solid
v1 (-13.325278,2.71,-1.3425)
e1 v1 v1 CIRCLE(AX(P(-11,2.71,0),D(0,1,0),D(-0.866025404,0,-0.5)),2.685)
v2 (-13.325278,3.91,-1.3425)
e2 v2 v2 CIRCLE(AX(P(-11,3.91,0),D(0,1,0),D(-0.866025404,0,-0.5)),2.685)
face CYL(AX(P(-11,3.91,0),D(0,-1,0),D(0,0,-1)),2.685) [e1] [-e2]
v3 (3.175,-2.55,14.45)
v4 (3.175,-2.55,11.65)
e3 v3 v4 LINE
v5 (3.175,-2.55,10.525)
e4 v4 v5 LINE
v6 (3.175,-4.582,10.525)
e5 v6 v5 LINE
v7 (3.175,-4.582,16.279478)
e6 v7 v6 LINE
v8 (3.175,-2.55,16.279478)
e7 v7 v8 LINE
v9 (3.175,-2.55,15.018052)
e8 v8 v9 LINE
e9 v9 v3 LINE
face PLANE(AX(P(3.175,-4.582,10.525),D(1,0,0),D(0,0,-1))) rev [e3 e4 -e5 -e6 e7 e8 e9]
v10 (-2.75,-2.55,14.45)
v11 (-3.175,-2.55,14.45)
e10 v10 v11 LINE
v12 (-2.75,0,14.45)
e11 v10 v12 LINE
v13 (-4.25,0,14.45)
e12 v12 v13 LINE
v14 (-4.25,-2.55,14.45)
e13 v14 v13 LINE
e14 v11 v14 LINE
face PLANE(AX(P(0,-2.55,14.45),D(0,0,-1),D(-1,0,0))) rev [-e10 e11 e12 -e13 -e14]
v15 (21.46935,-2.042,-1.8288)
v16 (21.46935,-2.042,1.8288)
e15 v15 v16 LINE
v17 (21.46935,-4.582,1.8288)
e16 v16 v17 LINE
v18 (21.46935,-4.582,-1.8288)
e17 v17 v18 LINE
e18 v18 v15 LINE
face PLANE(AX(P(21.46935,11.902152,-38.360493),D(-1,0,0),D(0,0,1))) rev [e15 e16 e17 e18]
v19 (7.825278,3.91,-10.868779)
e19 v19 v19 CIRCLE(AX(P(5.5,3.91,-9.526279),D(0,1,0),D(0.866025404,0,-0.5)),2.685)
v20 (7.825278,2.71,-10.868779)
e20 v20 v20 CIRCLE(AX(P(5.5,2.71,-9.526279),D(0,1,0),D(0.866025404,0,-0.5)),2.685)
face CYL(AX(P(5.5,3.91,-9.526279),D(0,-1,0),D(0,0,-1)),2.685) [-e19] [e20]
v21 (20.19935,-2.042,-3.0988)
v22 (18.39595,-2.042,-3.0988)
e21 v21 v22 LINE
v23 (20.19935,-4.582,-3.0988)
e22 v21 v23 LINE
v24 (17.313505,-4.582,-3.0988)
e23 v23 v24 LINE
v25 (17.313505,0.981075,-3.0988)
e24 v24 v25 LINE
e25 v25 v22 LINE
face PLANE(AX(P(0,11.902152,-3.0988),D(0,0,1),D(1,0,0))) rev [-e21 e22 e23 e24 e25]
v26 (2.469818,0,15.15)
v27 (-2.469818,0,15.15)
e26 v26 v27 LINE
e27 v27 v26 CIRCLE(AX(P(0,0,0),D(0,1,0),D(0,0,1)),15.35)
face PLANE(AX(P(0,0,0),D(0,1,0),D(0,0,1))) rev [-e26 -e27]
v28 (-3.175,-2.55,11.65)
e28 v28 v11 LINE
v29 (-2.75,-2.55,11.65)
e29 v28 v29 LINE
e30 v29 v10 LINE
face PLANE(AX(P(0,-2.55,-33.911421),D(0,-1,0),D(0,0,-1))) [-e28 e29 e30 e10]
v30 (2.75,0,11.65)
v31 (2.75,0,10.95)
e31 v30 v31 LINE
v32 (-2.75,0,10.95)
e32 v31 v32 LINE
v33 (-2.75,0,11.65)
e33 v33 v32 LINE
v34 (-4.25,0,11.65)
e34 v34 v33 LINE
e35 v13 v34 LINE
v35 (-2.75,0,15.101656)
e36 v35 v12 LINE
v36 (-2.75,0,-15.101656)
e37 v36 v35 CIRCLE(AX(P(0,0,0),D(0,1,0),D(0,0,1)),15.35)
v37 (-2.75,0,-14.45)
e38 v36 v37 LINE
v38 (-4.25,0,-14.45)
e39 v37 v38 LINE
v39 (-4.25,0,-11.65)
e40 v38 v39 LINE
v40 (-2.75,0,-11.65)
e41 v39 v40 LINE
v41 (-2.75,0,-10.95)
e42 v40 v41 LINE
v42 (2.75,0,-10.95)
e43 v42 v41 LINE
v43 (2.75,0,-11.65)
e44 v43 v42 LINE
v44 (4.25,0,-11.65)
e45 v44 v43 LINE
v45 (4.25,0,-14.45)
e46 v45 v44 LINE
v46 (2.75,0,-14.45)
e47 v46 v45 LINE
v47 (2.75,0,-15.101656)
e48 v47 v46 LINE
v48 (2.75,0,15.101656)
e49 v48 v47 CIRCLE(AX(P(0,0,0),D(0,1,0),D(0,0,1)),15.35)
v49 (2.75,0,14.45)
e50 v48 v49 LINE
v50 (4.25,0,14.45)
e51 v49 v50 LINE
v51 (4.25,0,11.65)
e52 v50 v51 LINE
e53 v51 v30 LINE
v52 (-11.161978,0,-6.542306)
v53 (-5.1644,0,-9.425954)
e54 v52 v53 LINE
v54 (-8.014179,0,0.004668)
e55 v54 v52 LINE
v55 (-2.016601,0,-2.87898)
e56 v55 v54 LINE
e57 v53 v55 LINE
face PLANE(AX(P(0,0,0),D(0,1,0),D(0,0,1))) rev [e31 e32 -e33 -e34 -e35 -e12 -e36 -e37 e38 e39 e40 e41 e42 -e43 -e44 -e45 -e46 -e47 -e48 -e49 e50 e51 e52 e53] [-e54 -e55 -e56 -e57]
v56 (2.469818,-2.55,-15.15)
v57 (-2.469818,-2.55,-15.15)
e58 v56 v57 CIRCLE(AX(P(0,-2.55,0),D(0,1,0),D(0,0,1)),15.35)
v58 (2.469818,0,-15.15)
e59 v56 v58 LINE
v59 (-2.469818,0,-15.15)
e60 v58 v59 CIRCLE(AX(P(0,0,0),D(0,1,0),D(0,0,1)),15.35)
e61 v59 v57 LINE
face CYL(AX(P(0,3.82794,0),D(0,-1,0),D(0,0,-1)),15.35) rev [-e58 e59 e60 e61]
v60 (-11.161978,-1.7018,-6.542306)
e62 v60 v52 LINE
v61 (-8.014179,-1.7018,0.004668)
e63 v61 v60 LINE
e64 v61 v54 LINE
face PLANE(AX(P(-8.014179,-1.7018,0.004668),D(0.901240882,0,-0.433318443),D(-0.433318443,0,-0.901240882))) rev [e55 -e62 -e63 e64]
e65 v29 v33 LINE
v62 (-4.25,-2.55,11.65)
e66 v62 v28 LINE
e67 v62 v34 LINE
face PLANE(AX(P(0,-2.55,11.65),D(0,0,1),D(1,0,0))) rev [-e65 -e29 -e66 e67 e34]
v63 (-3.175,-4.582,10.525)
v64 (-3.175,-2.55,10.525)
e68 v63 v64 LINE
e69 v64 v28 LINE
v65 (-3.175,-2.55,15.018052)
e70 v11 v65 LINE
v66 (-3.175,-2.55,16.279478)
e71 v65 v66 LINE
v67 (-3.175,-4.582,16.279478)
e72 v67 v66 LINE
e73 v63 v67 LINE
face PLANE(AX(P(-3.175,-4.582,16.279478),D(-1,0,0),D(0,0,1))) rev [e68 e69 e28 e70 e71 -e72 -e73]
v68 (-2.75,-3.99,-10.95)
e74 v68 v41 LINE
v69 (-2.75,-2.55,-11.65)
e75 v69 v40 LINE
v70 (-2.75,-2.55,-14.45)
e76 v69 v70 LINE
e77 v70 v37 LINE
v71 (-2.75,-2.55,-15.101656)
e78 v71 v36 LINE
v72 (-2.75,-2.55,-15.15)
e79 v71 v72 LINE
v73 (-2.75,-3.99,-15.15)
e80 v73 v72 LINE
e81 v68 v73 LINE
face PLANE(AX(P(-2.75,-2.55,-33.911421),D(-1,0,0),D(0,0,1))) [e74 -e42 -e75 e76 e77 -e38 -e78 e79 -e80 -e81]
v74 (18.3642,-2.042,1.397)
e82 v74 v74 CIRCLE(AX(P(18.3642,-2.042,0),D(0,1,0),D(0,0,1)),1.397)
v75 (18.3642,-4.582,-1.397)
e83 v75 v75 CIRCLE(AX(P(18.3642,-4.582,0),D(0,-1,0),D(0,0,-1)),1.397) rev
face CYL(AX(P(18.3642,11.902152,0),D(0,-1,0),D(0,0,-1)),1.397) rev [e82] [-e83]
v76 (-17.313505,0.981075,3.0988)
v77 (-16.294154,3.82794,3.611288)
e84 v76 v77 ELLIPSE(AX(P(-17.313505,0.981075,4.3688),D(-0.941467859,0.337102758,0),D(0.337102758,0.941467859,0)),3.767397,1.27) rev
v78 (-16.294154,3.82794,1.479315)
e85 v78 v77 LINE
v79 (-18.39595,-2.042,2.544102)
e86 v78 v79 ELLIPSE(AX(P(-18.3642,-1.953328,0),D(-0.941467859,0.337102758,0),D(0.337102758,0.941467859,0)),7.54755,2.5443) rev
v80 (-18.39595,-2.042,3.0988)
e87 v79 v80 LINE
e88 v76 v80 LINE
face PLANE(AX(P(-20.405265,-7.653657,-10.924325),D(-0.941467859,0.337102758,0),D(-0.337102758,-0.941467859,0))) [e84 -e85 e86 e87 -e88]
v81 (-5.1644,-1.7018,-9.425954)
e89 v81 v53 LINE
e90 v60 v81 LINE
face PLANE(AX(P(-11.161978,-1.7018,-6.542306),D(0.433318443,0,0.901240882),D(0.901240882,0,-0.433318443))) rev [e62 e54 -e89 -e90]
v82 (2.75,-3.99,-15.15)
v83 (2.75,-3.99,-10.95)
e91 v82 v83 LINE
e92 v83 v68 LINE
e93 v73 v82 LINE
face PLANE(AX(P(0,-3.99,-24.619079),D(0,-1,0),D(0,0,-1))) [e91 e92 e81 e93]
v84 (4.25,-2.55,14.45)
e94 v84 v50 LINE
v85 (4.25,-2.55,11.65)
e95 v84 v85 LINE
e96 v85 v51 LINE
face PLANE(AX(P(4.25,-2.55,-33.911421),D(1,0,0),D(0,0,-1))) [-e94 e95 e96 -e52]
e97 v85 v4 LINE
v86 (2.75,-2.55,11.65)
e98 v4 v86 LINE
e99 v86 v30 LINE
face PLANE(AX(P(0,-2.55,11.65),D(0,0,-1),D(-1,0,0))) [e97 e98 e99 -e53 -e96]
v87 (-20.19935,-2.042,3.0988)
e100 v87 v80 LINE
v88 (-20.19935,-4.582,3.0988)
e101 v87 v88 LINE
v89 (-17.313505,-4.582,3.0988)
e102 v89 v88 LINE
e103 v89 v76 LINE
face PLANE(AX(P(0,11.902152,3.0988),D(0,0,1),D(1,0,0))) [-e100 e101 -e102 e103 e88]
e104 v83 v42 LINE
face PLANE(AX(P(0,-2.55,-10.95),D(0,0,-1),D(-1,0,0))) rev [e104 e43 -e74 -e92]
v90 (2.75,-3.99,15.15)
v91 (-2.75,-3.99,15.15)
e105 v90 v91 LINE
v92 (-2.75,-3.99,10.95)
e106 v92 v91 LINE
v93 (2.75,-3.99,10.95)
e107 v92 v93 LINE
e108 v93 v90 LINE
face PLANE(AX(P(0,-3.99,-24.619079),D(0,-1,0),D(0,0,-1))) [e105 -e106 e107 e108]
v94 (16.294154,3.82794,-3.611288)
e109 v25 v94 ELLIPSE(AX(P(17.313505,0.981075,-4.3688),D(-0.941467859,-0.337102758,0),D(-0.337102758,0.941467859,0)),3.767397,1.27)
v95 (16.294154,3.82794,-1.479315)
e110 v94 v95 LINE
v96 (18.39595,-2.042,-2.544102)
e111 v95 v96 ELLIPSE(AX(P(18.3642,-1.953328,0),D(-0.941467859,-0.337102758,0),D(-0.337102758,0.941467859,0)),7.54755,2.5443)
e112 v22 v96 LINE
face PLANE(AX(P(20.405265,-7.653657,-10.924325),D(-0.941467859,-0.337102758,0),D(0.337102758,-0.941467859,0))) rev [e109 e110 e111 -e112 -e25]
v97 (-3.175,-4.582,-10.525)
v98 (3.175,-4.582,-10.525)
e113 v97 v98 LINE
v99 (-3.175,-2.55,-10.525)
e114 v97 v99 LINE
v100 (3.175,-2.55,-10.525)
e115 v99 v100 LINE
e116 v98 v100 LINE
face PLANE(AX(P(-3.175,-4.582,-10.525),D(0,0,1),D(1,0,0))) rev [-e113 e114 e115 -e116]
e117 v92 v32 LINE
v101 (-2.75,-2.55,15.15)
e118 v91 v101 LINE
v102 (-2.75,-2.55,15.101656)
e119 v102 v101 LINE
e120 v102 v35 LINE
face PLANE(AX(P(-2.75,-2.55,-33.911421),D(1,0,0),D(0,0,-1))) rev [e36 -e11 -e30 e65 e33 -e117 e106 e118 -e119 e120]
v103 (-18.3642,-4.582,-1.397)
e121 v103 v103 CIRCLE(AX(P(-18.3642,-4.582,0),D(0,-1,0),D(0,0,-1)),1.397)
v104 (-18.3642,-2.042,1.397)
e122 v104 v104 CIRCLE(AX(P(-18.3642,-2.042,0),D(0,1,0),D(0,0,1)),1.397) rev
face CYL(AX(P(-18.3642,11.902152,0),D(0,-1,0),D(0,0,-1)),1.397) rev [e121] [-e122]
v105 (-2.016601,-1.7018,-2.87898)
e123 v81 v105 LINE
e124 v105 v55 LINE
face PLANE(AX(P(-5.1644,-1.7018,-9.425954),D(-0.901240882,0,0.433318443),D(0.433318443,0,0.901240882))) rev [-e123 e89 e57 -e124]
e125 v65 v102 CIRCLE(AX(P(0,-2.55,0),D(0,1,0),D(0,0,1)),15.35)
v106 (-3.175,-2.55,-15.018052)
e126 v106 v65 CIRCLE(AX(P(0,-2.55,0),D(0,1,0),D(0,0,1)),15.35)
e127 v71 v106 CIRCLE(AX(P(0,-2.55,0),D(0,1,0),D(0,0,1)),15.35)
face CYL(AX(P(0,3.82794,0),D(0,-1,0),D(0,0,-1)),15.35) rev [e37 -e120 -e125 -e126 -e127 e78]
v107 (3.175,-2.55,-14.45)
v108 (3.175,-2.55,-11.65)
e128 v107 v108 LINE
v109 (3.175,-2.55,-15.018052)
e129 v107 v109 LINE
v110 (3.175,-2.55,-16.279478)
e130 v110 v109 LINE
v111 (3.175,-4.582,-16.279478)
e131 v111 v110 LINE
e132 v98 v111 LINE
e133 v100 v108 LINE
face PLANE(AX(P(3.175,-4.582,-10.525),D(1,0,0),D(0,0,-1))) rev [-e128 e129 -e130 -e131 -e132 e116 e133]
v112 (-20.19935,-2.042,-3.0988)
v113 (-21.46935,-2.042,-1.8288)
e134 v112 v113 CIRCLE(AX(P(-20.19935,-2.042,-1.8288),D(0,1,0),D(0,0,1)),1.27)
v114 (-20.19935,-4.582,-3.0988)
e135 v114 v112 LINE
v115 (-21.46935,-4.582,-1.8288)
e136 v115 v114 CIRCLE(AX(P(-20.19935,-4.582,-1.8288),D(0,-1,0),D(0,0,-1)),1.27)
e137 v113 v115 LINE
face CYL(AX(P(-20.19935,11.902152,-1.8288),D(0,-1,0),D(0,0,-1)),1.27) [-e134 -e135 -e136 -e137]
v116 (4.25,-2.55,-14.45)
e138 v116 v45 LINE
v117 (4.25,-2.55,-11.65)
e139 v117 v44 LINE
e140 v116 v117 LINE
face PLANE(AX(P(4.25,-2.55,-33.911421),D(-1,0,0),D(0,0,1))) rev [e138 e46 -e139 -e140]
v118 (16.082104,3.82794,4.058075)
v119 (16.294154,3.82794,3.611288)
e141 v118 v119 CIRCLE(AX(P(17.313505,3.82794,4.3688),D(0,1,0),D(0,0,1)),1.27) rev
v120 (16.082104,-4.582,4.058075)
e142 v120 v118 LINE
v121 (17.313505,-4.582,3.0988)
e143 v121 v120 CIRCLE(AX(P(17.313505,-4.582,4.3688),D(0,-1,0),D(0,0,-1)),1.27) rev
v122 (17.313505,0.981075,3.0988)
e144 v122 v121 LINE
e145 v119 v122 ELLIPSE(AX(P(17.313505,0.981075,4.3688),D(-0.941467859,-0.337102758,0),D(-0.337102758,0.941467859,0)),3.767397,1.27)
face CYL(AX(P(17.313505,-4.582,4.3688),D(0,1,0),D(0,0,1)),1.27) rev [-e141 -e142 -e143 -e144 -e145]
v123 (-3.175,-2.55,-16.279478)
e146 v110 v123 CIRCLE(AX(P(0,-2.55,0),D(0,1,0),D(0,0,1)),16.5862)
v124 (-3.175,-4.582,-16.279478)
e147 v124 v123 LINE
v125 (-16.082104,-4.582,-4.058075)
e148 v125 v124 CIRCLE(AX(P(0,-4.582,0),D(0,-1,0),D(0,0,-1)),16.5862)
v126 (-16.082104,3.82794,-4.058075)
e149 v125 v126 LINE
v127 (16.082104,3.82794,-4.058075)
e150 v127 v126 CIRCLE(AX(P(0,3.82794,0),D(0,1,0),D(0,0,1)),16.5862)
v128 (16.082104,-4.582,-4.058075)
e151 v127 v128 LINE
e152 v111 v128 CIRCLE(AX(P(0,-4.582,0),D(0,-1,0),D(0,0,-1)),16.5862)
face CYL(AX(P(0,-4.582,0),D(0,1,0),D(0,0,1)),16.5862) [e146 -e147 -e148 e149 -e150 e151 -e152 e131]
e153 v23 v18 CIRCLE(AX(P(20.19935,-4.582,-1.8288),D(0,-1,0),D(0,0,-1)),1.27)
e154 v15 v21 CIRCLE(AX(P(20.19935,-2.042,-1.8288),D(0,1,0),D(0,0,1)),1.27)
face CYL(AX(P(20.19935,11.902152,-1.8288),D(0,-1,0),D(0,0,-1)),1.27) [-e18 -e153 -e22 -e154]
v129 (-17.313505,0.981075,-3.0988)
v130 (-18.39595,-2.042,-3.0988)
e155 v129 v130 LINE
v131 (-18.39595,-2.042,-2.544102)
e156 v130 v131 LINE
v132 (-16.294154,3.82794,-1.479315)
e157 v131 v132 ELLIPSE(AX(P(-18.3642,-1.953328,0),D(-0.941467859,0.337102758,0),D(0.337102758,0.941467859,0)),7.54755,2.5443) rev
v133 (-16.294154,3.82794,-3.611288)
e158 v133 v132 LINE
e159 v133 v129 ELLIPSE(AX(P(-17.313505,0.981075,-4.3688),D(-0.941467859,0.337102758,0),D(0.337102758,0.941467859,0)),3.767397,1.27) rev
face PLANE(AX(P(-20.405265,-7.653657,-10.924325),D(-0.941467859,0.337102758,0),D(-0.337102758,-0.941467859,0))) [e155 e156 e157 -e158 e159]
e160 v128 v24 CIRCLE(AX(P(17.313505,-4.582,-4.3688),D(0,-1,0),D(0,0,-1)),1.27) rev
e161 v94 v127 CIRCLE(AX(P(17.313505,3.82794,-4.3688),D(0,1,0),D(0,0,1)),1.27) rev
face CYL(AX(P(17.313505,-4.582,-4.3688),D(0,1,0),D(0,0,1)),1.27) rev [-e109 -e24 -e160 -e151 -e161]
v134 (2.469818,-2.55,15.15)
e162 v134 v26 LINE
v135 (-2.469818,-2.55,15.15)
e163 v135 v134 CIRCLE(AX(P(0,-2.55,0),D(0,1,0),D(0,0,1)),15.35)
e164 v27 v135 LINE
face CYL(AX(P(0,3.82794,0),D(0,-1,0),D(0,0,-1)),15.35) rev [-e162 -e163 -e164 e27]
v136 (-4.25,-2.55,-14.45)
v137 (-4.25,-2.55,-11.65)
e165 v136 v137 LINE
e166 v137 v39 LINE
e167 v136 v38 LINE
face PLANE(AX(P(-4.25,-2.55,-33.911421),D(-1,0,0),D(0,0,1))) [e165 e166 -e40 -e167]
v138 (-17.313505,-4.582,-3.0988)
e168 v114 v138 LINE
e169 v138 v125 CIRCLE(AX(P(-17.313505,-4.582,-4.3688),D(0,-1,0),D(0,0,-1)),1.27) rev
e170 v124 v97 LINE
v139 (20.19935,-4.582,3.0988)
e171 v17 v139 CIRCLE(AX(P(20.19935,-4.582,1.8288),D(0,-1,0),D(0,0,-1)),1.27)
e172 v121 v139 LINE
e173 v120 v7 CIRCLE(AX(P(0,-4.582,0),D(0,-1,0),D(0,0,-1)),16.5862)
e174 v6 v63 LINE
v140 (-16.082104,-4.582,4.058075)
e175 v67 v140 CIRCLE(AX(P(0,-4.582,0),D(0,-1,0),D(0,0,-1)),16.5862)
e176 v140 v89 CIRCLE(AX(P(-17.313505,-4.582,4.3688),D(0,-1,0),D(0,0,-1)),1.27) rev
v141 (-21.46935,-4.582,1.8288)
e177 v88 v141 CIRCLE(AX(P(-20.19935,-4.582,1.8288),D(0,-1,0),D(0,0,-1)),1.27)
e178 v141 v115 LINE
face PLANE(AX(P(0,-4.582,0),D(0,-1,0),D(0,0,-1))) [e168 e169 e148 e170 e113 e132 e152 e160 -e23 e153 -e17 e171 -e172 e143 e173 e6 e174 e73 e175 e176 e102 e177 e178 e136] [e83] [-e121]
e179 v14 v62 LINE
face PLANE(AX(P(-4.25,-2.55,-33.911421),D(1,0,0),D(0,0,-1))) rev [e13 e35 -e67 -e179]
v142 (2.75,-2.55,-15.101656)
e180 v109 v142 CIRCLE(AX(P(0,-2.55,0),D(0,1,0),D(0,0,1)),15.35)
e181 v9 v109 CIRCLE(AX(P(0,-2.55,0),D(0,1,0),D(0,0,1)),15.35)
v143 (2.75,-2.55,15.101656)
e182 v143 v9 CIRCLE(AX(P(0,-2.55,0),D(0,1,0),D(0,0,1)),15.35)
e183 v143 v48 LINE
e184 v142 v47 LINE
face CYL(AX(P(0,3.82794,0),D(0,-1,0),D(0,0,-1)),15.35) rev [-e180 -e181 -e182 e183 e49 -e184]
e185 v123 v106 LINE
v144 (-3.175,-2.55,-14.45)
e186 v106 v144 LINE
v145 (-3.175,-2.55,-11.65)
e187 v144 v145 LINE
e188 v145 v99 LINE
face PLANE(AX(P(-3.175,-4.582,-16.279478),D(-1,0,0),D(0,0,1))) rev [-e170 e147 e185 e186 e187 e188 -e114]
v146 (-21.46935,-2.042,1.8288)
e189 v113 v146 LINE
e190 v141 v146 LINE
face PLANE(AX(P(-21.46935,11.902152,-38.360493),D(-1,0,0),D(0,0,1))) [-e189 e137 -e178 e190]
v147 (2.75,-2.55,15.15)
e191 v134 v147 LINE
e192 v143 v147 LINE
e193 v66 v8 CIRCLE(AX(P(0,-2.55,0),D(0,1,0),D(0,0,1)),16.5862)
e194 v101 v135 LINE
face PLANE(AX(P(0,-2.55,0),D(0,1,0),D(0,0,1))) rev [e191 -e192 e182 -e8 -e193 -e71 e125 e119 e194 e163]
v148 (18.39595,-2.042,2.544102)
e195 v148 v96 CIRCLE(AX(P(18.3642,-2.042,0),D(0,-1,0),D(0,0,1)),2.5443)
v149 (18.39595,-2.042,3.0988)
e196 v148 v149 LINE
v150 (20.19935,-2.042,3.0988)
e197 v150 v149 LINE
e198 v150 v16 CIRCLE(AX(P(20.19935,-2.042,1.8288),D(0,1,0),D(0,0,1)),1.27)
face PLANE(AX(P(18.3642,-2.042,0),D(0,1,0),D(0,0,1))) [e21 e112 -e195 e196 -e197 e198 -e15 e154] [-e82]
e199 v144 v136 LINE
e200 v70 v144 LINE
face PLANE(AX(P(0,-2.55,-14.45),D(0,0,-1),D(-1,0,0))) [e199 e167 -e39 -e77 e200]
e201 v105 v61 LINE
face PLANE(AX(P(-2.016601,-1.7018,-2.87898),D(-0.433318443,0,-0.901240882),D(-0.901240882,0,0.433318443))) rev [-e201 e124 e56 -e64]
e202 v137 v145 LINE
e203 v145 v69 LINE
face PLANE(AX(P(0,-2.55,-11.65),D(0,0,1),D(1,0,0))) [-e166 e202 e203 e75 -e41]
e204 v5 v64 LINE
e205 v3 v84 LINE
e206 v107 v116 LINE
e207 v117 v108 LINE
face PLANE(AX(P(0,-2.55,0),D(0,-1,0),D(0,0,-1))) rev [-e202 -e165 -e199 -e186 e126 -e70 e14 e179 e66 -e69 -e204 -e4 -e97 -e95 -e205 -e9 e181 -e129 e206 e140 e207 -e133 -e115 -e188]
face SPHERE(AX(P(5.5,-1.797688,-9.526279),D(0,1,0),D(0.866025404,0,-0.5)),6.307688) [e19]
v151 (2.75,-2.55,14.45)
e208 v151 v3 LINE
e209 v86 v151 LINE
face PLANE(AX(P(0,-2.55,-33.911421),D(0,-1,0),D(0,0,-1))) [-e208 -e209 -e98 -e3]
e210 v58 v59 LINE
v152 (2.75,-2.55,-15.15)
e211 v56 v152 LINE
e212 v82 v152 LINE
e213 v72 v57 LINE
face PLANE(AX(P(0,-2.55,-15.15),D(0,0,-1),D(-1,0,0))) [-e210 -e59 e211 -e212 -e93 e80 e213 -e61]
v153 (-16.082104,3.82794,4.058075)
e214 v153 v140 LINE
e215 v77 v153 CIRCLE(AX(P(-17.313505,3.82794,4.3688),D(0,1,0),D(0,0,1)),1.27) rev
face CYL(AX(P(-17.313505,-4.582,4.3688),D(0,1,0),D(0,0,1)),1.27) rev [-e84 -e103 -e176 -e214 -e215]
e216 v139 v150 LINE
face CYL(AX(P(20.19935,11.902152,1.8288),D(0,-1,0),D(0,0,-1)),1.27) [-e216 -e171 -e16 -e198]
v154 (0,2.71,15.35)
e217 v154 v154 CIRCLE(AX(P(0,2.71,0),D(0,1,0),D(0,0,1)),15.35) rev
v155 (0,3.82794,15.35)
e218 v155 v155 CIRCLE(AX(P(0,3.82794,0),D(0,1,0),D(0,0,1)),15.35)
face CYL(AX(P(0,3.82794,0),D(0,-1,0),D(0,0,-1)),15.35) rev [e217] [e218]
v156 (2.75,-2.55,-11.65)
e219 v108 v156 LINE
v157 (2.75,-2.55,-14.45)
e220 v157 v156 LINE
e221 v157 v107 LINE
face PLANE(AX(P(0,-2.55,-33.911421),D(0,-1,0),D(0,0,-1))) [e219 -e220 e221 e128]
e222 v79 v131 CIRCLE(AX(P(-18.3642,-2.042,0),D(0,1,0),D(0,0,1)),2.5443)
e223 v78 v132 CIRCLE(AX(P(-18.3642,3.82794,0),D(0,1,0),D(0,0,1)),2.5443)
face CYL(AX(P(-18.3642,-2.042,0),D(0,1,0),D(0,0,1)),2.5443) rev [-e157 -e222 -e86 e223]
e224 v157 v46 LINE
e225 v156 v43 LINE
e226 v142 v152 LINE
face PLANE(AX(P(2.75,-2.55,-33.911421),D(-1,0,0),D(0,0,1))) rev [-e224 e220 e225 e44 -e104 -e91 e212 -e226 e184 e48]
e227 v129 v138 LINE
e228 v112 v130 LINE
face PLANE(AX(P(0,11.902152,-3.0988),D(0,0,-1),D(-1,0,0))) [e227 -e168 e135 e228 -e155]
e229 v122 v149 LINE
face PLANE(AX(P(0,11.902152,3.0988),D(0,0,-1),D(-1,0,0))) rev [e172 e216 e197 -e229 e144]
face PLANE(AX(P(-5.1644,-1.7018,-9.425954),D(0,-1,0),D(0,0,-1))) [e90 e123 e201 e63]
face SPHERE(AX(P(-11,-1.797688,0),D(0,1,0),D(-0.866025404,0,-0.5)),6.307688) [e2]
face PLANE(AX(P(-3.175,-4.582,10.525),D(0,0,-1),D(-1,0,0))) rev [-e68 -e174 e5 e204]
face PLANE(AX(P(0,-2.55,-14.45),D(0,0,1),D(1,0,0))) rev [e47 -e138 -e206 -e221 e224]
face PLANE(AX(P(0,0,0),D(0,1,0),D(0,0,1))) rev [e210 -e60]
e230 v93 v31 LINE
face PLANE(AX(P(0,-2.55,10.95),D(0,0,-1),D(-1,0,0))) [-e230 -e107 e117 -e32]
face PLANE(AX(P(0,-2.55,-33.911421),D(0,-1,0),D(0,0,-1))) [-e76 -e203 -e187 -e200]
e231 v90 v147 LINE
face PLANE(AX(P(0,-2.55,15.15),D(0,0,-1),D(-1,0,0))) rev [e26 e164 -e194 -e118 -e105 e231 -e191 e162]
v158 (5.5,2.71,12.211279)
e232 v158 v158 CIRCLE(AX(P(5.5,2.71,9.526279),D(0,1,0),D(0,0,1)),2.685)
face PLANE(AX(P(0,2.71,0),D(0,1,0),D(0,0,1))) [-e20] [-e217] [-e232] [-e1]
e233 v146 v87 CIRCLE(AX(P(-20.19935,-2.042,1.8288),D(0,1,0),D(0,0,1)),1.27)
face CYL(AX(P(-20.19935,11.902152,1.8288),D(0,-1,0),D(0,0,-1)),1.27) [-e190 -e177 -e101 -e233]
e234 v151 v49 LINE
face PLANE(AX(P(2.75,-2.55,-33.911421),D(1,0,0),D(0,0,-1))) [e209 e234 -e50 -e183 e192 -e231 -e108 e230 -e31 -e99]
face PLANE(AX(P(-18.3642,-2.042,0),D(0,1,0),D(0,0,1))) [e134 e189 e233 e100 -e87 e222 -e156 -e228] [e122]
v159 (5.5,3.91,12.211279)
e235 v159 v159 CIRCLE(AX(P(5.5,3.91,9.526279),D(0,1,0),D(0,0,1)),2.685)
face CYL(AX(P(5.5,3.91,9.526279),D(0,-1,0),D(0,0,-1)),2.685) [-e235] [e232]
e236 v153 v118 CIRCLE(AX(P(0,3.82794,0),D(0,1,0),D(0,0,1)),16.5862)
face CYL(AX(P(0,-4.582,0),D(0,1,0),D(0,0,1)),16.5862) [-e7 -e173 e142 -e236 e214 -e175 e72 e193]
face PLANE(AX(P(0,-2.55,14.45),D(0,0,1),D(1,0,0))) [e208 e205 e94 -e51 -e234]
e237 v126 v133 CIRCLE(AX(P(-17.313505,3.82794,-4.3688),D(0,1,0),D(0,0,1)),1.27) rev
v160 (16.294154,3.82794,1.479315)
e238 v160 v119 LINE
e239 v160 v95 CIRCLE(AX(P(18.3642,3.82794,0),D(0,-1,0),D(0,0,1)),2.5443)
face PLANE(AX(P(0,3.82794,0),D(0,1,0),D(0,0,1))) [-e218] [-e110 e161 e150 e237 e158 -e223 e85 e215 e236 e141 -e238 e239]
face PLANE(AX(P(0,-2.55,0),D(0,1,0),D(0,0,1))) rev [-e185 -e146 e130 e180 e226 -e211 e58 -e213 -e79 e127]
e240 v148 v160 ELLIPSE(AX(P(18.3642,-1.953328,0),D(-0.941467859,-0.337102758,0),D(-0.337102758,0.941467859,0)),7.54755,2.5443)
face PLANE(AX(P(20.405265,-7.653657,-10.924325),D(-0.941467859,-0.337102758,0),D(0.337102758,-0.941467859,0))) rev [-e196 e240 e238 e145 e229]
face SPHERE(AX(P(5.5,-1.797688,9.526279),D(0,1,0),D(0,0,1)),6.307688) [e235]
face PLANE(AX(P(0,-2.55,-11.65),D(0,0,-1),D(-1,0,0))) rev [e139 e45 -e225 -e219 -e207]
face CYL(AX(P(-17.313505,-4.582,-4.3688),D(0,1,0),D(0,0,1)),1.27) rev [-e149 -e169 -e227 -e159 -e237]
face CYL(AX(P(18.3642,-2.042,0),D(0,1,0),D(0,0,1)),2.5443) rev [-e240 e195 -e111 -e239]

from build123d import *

# Parameters (mm, degrees)
SKETCH1_R                      = 15.35
BOSS_EXTRUDE1_DEPTH            = 2.71
SKETCH2_R                      = 2.685
BOSS_EXTRUDE2_DEPTH            = 1.2
DOME1_FACE_RADIUS              = 2.685
DOME1_HEIGHT                   = 0.6
CIRPATTERN1_COUNT              = 3
CIRPATTERN1_COPY_1_FACE_RADIUS = 2.685
CIRPATTERN1_COPY_1_HEIGHT      = 0.6
CIRPATTERN1_COPY_2_FACE_RADIUS = 2.685
CIRPATTERN1_COPY_2_HEIGHT      = 0.6
BOSS_EXTRUDE3_START            = 2.55
SKETCH3_W                      = 5.5
SKETCH3_H                      = 4.2
SKETCH3_W_2                    = 1.5
SKETCH3_H_2                    = 2.8
BOSS_EXTRUDE3_DEPTH            = 2.55
SKETCH4_W                      = 5.5
SKETCH4_H                      = 4.2
BOSS_EXTRUDE4_DEPTH            = 1.44
CHIP_DEPTH                     = 1.7018
BOSS_EXTRUDE5_DEPTH            = 2.032
BOSS_EXTRUDE6_START            = 6.37794
SKETCH7_R                      = 16.5862
SKETCH7_R_2                    = 15.35
BOSS_EXTRUDE6_DEPTH            = 6.37794
BOSS_EXTRUDE7_START            = -8.40994
SKETCH8_R                      = 1.397
BOSS_EXTRUDE7_DEPTH            = 8.40994
SKETCH9_R                      = 2.5443
CUT_EXTRUDE1_DEPTH             = 5.86994
CUT_EXTRUDE4_REACH             = 31.486
FILLET1_R                      = 1.27


with BuildPart() as part:
    # Sketch1 → Boss-Extrude1 (new body)
    with BuildSketch(Plane(origin=(0, 0, 0), x_dir=(1, 0, 0), z_dir=(0, 1, 0))):
        with Locations(Location((0, 0, 0), (0, 0, 270))):
            Circle(SKETCH1_R)
    extrude(amount=BOSS_EXTRUDE1_DEPTH)

    # Sketch2 → Boss-Extrude2 (add)
    with BuildSketch(Plane(origin=(0, 2.71, 0), x_dir=(-1, 0, 0), z_dir=(0, 1, 0))):
        with Locations(Location((-5.5, 9.526279442, 0), (0, 0, 90))):
            Circle(SKETCH2_R)
    boss_extrude2 = extrude(amount=BOSS_EXTRUDE2_DEPTH)

    # Dome1: a dome of height H over a round flat face of radius A is a cap of a sphere of radius (A * A + H * H) / (2 * H)
    dome1_r = (DOME1_FACE_RADIUS * DOME1_FACE_RADIUS + DOME1_HEIGHT * DOME1_HEIGHT) / (2 * DOME1_HEIGHT)
    dome1_base = Plane((5.5, 3.91, 9.526279442), z_dir=(0, 1, 0))
    with Locations(dome1_base.offset(DOME1_HEIGHT - dome1_r)):
        dome1_ball = Sphere(dome1_r, mode=Mode.PRIVATE)
    add(split(dome1_ball, bisect_by=dome1_base, keep=Keep.TOP, mode=Mode.PRIVATE))

    # CirPattern1: Boss-Extrude2 ×3 about axis
    cirpattern1_axis = Axis((0, 0, 0), (0, 1, 0))
    for i in range(1, CIRPATTERN1_COUNT):
        add(boss_extrude2.rotate(cirpattern1_axis, i * 360 / CIRPATTERN1_COUNT))

    # CirPattern1 copy 1: a dome of height H over a round flat face of radius A is a cap of a sphere of radius (A * A + H * H) / (2 * H)
    cirpattern1_copy_1_r = (CIRPATTERN1_COPY_1_FACE_RADIUS * CIRPATTERN1_COPY_1_FACE_RADIUS + CIRPATTERN1_COPY_1_HEIGHT * CIRPATTERN1_COPY_1_HEIGHT) / (2 * CIRPATTERN1_COPY_1_HEIGHT)
    cirpattern1_copy_1_base = Plane((5.5, 3.91, -9.526279442), z_dir=(0, 1, 0))
    with Locations(cirpattern1_copy_1_base.offset(CIRPATTERN1_COPY_1_HEIGHT - cirpattern1_copy_1_r)):
        cirpattern1_copy_1_ball = Sphere(cirpattern1_copy_1_r, mode=Mode.PRIVATE)
    add(split(cirpattern1_copy_1_ball, bisect_by=cirpattern1_copy_1_base, keep=Keep.TOP, mode=Mode.PRIVATE))

    # CirPattern1 copy 2: a dome of height H over a round flat face of radius A is a cap of a sphere of radius (A * A + H * H) / (2 * H)
    cirpattern1_copy_2_r = (CIRPATTERN1_COPY_2_FACE_RADIUS * CIRPATTERN1_COPY_2_FACE_RADIUS + CIRPATTERN1_COPY_2_HEIGHT * CIRPATTERN1_COPY_2_HEIGHT) / (2 * CIRPATTERN1_COPY_2_HEIGHT)
    cirpattern1_copy_2_base = Plane((-11, 3.91, 0), z_dir=(0, 1, 0))
    with Locations(cirpattern1_copy_2_base.offset(CIRPATTERN1_COPY_2_HEIGHT - cirpattern1_copy_2_r)):
        cirpattern1_copy_2_ball = Sphere(cirpattern1_copy_2_r, mode=Mode.PRIVATE)
    add(split(cirpattern1_copy_2_ball, bisect_by=cirpattern1_copy_2_base, keep=Keep.TOP, mode=Mode.PRIVATE))

    # Sketch3 → Boss-Extrude3 (add)
    with BuildSketch(Plane.XZ.offset(BOSS_EXTRUDE3_START)):
        with Locations((0, 13.05)):
            Rectangle(SKETCH3_W, SKETCH3_H)
        with Locations((0, -13.05)):
            Rectangle(SKETCH3_W, SKETCH3_H)
        with Locations((3.5, 13.05)):
            Rectangle(SKETCH3_W_2, SKETCH3_H_2)
        with Locations((-3.5, 13.05)):
            Rectangle(SKETCH3_W_2, SKETCH3_H_2)
        with Locations((3.5, -13.05)):
            Rectangle(SKETCH3_W_2, SKETCH3_H_2)
        with Locations((-3.5, -13.05)):
            Rectangle(SKETCH3_W_2, SKETCH3_H_2)
        with BuildLine():
            Line((2.75, 15.101655538), (2.75, 15.15))
            Line((2.75, 15.15), (2.469817807, 15.15))
            ThreePointArc((2.469817807, 15.15), (2.610020839, 15.126476497), (2.75, 15.101655538))
        make_face()
        with BuildLine():
            ThreePointArc((-2.75, 15.101655538), (-2.610020839, 15.126476497), (-2.469817807, 15.15))
            Line((-2.469817807, 15.15), (-2.75, 15.15))
            Line((-2.75, 15.15), (-2.75, 15.101655538))
        make_face()
        with BuildLine():
            ThreePointArc((-2.469817807, -15.15), (-2.610020839, -15.126476497), (-2.75, -15.101655538))
            Line((-2.75, -15.101655538), (-2.75, -15.15))
            Line((-2.75, -15.15), (-2.469817807, -15.15))
        make_face()
        with BuildLine():
            Line((2.75, -15.15), (2.75, -15.101655538))
            ThreePointArc((2.75, -15.101655538), (2.610020839, -15.126476497), (2.469817807, -15.15))
            Line((2.469817807, -15.15), (2.75, -15.15))
        make_face()
    extrude(amount=-BOSS_EXTRUDE3_DEPTH)

    # Sketch4 → Boss-Extrude4 (add)
    with BuildSketch(Plane.XZ.offset(2.55)):
        Polygon((-2.75, 10.95), (2.75, 10.95), (2.75, 11.65), (2.75, 14.45), (2.75, 15.15), (-2.75, 15.15), (-2.75, 14.45), (-2.75, 11.65), align=None)
        with Locations((0, -13.05)):
            Rectangle(SKETCH4_W, SKETCH4_H)
    extrude(amount=BOSS_EXTRUDE4_DEPTH)

    # Sketch5 → Chip (add)
    with BuildSketch(Plane.XZ):
        Polygon((-5.1644, -9.425953844), (-2.016601499, -2.878979584), (-8.014179317, 0.004667994), (-11.161977818, -6.542306266), align=None)
    extrude(amount=CHIP_DEPTH)

    # Sketch6 → Boss-Extrude5 (add)
    with BuildSketch(Plane.XZ.offset(2.55)):
        with BuildLine():
            Line((-3.175, 16.279478046), (-3.175, 10.525))
            Line((-3.175, 10.525), (3.175, 10.525))
            Line((3.175, 10.525), (3.175, 16.279478046))
            ThreePointArc((3.175, 16.279478046), (16.5862, 0), (3.175, -16.279478046))
            Line((3.175, -16.279478046), (3.175, -10.525))
            Line((3.175, -10.525), (-3.175, -10.525))
            Line((-3.175, -10.525), (-3.175, -16.279478046))
            ThreePointArc((-3.175, -16.279478046), (-16.5862, 0), (-3.175, 16.279478046))
        make_face()
    extrude(amount=BOSS_EXTRUDE5_DEPTH)

    # Sketch7 → Boss-Extrude6 (add)
    with BuildSketch(Plane(origin=(0, -2.55, 0), x_dir=(1, 0, 0), z_dir=(0, 1, 0)).offset(BOSS_EXTRUDE6_START)):
        with Locations(Location((0, 0, 0), (0, 0, 270))):
            Circle(SKETCH7_R)
        with Locations(Location((0, 0, 0), (0, 0, 270))):
            Circle(SKETCH7_R_2, mode=Mode.SUBTRACT)
    extrude(amount=-BOSS_EXTRUDE6_DEPTH)

    # Sketch8 → Boss-Extrude7 (add)
    # profile 1 of 2: a face of its own
    with BuildSketch(Plane.XZ.offset(4.582).offset(BOSS_EXTRUDE7_START)):
        with BuildLine():
            ThreePointArc((-16.294154443, -3.0988), (-16.5862, 0), (-16.294154443, 3.0988))
            Line((-16.294154443, 3.0988), (-21.46935, 3.0988))
            Line((-21.46935, 3.0988), (-21.46935, -3.0988))
            Line((-21.46935, -3.0988), (-16.294154443, -3.0988))
        make_face()
        with Locations(Location((-18.3642, 0, 0), (0, 0, 270))):
            Circle(SKETCH8_R, mode=Mode.SUBTRACT)
    # profile 2 of 2: a face of its own
    with BuildSketch(Plane.XZ.offset(4.582).offset(BOSS_EXTRUDE7_START)):
        with BuildLine():
            Line((21.46935, 3.0988), (16.294154443, 3.0988))
            ThreePointArc((16.294154443, 3.0988), (16.5862, 0), (16.294154443, -3.0988))
            Line((16.294154443, -3.0988), (21.46935, -3.0988))
            Line((21.46935, -3.0988), (21.46935, 3.0988))
        make_face()
        with Locations(Location((18.3642, 0, 0), (0, 0, 270))):
            Circle(SKETCH8_R, mode=Mode.SUBTRACT)
    extrude(amount=BOSS_EXTRUDE7_DEPTH)

    # Sketch9 → Cut-Extrude1 (cut)
    with BuildSketch(Plane(origin=(0, 3.82794, 0), x_dir=(1, 0, 0), z_dir=(0, 1, 0))):
        with Locations(Location((-18.3642, 0, 0), (0, 0, 270))):
            Circle(SKETCH9_R)
    cut_extrude1 = extrude(amount=-CUT_EXTRUDE1_DEPTH, mode=Mode.SUBTRACT)

    # Cut-Extrude4: up to this face of the body (flat: up to its plane)
    cut_extrude4_end = Plane(part.part.faces().sort_by_distance((-18.881752221, -0.37703, -3.0988))[0])
    # Sketch10 → Cut-Extrude4 (cut, up to the picked face)
    with BuildSketch(Plane.XY.offset(3.0988), mode=Mode.PRIVATE) as cut_extrude4_sk1:
        Polygon((-21.46935, -2.042), (-18.39595, -2.042), (-16.294154443, 3.82794), (-21.46935, 3.82794), align=None)
    cut_extrude4_tool1 = split(extrude(cut_extrude4_sk1.sketch, amount=-CUT_EXTRUDE4_REACH, mode=Mode.PRIVATE), bisect_by=cut_extrude4_end, keep=Keep.BOTH, mode=Mode.PRIVATE)
    cut_extrude4 = cut_extrude4_tool1.solids().sort_by(Axis((-19.362572, 1.142253, 3.0988), (0, 0, -1)))[0]
    add(cut_extrude4, mode=Mode.SUBTRACT)

    # Mirror2: Cut-Extrude1, Cut-Extrude4 across plane
    add(cut_extrude1.mirror(Plane(origin=(0, 0, 0), x_dir=(0, 0, 1), z_dir=(1, 0, 0))), mode=Mode.SUBTRACT)
    add(cut_extrude4.mirror(Plane(origin=(0, 0, 0), x_dir=(0, 0, 1), z_dir=(1, 0, 0))), mode=Mode.SUBTRACT)

    # Fillet1
    fillet1_edges = [part.edges().sort_by_distance(p)[0] for p in [
        (16.294154443, -0.37703, -3.0988),
        (16.294154443, -0.37703, 3.0988),
        (-16.294154443, 0.63897, -3.0988),
        (-16.294154443, 0.63897, 3.0988),
        (-21.46935, -3.312, 3.0988),
        (-21.46935, -3.312, -3.0988),
        (21.46935, -3.312, 3.0988),
        (21.46935, -3.312, -3.0988),
    ]]
    fillet(fillet1_edges, radius=FILLET1_R)


solid = part.part
